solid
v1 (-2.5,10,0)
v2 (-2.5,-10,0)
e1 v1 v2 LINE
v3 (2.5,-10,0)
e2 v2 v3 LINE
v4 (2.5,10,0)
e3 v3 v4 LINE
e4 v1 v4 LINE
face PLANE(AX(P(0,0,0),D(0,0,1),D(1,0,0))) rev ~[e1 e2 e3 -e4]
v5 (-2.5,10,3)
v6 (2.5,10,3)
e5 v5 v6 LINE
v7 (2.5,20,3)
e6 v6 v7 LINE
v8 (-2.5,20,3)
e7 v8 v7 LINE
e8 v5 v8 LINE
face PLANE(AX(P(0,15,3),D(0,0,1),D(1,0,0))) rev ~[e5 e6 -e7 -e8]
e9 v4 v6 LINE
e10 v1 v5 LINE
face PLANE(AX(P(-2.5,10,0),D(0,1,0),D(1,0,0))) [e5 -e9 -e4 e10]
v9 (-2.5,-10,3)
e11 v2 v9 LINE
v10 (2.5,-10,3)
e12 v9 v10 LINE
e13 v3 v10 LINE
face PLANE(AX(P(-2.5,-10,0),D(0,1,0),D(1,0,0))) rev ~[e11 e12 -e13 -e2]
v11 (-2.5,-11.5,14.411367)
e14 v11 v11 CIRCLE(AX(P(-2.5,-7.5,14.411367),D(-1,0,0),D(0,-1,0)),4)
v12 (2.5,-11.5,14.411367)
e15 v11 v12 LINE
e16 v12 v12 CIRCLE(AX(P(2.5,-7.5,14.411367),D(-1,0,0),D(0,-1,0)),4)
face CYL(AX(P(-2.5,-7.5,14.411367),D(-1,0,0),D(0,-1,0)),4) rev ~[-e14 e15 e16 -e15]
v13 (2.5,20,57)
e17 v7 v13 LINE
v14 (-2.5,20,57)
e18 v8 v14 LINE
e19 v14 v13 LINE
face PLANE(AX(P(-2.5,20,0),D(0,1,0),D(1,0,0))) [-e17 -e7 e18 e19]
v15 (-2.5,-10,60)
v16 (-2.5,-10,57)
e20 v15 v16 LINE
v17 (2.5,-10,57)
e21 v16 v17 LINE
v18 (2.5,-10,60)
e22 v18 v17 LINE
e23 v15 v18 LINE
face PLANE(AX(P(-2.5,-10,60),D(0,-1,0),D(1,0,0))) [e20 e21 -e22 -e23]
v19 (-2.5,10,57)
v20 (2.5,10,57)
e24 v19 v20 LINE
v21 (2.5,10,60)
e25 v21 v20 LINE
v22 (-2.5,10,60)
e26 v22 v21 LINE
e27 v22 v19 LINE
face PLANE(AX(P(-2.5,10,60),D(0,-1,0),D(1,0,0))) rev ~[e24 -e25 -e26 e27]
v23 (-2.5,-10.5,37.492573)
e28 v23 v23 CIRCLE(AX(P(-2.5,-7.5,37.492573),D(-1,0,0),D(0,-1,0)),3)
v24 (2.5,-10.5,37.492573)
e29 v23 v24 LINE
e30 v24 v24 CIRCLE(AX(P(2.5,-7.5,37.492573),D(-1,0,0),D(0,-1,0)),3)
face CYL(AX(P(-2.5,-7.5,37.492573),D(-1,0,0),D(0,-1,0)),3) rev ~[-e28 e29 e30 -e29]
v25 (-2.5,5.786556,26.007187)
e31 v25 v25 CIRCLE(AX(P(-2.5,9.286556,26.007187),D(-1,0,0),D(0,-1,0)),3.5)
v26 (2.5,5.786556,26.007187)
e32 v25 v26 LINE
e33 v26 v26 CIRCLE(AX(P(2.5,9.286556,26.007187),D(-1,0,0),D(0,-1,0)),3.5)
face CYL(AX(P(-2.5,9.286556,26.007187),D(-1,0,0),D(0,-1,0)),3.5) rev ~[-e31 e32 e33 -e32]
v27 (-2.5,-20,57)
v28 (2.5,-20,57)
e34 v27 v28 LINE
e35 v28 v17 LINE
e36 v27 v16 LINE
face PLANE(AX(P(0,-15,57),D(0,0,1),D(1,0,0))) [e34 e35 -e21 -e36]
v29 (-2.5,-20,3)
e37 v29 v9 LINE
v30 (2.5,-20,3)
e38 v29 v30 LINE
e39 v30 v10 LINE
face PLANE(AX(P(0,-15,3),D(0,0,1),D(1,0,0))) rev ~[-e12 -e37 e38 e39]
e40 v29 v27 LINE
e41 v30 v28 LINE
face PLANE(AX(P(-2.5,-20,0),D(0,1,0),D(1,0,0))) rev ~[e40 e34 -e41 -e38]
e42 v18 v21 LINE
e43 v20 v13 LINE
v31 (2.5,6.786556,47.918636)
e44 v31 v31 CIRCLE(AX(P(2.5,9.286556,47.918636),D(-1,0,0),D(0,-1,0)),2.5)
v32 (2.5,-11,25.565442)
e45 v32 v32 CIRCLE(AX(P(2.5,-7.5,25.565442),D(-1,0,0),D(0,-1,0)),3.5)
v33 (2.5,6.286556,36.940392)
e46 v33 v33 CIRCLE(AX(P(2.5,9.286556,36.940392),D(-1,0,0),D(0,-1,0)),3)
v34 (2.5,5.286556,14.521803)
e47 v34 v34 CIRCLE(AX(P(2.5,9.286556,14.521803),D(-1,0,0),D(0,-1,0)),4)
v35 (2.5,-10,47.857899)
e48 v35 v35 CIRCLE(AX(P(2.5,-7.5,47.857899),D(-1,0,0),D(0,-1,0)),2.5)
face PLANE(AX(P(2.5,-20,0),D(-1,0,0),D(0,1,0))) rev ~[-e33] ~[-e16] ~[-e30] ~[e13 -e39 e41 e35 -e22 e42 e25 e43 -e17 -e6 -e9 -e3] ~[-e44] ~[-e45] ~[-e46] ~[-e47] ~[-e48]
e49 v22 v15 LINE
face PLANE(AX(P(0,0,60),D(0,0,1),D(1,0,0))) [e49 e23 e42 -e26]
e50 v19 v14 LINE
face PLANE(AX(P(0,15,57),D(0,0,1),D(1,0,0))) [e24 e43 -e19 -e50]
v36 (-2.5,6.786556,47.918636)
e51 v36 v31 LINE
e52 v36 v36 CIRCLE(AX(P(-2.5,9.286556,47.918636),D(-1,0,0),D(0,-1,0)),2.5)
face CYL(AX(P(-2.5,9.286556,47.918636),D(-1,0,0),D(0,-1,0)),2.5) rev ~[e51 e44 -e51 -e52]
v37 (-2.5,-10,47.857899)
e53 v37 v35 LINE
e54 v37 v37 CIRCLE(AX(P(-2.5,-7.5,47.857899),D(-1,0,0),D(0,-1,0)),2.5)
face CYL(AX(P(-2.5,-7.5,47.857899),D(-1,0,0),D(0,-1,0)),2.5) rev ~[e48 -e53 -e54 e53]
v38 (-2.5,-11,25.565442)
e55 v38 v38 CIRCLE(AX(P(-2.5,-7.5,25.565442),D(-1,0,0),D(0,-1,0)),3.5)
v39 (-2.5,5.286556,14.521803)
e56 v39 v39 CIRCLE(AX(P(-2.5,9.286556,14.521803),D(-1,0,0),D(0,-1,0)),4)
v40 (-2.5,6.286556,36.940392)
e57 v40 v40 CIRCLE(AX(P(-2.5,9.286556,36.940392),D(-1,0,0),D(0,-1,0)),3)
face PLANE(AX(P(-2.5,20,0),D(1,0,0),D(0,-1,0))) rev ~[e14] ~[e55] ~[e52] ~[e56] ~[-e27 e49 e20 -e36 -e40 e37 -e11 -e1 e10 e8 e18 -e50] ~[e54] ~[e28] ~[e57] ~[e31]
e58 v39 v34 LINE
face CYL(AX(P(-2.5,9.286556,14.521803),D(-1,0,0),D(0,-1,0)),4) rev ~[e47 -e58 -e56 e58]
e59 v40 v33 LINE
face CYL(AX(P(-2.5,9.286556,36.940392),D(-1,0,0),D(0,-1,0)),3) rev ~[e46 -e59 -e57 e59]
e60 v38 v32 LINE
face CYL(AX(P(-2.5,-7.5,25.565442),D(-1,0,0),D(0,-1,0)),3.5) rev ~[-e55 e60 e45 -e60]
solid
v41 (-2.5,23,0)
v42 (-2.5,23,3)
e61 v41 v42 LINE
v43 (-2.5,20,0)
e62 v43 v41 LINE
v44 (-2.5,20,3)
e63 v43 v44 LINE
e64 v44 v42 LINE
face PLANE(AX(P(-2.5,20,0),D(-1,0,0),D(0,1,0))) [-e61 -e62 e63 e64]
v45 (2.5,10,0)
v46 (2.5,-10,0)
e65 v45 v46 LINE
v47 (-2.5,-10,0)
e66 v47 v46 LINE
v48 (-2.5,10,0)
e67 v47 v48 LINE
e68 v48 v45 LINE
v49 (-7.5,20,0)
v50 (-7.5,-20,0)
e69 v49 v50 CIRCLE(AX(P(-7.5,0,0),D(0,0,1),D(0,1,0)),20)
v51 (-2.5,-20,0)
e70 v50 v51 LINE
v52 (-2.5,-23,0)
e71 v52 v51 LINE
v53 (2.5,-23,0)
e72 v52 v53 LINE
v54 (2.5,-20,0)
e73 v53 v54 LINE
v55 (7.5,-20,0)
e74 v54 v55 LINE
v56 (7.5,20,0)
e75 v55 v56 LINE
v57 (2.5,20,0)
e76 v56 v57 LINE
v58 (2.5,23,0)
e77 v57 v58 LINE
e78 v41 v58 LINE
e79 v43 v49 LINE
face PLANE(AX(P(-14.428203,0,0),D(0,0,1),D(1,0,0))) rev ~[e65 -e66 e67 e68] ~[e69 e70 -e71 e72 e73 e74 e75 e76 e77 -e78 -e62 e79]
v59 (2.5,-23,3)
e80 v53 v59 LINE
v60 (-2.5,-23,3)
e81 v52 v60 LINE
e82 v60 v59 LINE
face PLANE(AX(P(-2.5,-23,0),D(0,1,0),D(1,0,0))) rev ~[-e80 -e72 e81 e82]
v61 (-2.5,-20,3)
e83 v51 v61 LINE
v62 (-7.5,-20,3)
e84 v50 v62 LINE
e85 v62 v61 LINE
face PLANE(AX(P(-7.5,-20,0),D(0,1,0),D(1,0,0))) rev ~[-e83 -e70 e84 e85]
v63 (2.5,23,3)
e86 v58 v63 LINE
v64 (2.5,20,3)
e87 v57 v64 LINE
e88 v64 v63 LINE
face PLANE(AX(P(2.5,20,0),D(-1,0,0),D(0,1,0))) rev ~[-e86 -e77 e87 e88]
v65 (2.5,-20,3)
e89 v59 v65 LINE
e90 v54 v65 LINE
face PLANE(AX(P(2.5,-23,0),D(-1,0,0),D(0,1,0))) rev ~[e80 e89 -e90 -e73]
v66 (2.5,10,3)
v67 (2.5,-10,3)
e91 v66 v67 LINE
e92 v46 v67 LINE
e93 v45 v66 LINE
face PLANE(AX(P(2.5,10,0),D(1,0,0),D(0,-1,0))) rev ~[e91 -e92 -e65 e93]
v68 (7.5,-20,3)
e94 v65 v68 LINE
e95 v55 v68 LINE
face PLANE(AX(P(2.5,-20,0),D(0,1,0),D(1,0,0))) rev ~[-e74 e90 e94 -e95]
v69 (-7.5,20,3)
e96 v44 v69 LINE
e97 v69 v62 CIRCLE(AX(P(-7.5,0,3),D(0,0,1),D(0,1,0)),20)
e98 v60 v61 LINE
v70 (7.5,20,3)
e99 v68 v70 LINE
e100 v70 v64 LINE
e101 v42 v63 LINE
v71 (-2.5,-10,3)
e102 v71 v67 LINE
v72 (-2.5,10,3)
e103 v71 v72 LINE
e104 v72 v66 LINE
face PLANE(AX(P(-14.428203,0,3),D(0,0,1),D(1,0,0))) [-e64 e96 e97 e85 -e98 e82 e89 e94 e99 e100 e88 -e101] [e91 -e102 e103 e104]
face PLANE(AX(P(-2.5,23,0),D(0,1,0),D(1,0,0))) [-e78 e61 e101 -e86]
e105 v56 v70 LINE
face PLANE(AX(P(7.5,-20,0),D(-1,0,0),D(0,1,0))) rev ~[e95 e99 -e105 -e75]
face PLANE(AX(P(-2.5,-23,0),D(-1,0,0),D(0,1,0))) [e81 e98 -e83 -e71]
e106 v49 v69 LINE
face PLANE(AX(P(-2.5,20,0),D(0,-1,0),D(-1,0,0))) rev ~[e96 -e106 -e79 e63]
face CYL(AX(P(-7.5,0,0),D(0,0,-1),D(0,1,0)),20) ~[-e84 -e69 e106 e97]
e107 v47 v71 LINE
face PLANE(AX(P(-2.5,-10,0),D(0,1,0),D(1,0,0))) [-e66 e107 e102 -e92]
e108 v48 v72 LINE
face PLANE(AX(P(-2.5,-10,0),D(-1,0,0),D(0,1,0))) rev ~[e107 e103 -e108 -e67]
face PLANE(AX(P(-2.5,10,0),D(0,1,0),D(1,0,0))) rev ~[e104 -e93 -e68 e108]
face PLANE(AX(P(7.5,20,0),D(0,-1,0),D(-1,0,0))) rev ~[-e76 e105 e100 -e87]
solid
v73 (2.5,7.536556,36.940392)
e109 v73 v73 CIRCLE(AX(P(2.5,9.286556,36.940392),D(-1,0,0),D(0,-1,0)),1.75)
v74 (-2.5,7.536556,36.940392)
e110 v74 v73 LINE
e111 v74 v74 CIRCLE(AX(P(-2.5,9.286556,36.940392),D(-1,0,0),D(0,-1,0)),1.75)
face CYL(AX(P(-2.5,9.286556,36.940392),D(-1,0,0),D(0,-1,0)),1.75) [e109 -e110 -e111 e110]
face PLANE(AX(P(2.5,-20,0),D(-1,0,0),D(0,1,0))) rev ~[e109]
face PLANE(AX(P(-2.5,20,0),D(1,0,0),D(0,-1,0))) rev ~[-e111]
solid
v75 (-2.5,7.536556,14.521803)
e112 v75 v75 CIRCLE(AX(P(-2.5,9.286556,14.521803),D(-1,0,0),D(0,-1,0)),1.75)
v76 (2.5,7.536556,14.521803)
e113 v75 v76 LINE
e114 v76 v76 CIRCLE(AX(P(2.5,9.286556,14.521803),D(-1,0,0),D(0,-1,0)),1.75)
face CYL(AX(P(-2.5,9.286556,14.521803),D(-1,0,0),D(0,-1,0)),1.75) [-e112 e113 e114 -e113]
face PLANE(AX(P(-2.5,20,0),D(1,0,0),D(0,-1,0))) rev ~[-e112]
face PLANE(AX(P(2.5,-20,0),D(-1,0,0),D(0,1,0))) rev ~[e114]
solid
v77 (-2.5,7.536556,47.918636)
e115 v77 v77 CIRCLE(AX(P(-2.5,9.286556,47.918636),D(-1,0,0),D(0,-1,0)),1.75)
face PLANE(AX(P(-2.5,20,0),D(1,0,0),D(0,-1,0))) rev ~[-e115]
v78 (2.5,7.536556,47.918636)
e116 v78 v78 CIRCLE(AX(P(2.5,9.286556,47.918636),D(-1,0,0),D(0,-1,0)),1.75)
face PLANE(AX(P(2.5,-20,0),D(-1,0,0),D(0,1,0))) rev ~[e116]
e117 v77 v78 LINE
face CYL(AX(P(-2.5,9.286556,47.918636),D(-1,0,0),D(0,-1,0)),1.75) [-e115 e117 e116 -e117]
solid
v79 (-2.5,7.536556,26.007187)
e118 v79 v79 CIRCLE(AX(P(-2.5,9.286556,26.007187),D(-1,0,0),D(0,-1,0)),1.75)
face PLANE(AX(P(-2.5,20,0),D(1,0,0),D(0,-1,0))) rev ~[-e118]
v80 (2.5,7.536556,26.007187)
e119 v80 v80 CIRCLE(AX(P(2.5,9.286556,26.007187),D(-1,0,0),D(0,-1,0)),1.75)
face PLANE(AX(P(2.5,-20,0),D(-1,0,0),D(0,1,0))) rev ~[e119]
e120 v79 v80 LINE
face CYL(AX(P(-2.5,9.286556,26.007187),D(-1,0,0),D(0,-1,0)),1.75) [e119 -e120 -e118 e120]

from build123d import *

# Parameters (mm, degrees)
F0_W     = 5
F0_H     = 3
F0_H_2   = 10
F1_DEPTH = 3
F0_H_3   = 20
F2_DEPTH = 60
F3_DEPTH = 3
F4_W     = 5
F4_H     = 10
F5_DEPTH = 3
F6_R     = 2.5
F6_R_2   = 3
F6_R_3   = 3.5
F6_R_4   = 4
F6_R_5   = 1.75
F7_DEPTH = 5


with BuildPart() as f1:
    # F0 (on Top) → F1 (new body)
    with BuildSketch(Plane.XY):
        with BuildLine():
            Line((-7.5, -20), (-7.5, 20))
            ThreePointArc((-7.5, 20), (-27.5, 0), (-7.5, -20))
        make_face()
        Polygon((7.5, -20), (7.5, 20), (2.5, 20), (2.5, 10), (2.5, -10), (2.5, -20), align=None)
        with Locations((0, 21.5)):
            Rectangle(F0_W, F0_H)
        with Locations((0, -21.5)):
            Rectangle(F0_W, F0_H)
        Polygon((-2.5, 10), (-2.5, 20), (-7.5, 20), (-7.5, -20), (-2.5, -20), (-2.5, -10), align=None)
        with Locations((0, 15)):
            Rectangle(F0_W, F0_H_2)
        with Locations((0, -15)):
            Rectangle(F0_W, F0_H_2)
    extrude(amount=F1_DEPTH)


with BuildPart() as f2:
    # F0 (on Top) → F2 (new body)
    with BuildSketch(Plane.XY):
        Rectangle(F0_W, F0_H_3)
        with Locations((0, 15)):
            Rectangle(F0_W, F0_H_2)
        with Locations((0, -15)):
            Rectangle(F0_W, F0_H_2)
    extrude(amount=F2_DEPTH)

    # F0 (on Top) → F3 (cut)
    with BuildSketch(Plane.XY):
        with Locations((0, 15)):
            Rectangle(F0_W, F0_H_2)
        with Locations((0, -15)):
            Rectangle(F0_W, F0_H_2)
    extrude(amount=F3_DEPTH, mode=Mode.SUBTRACT)

    # F4 (on face) → F5 (cut)
    with BuildSketch(Plane.XY.offset(60)):
        with Locations((0, -15)):
            Rectangle(F4_W, F4_H)
        with Locations((0, 15)):
            Rectangle(F4_W, F4_H)
    extrude(amount=-F5_DEPTH, mode=Mode.SUBTRACT)

    # F6 (on face) → F7 (cut, through all)
    with BuildSketch(Plane(origin=(-2.5, 0, 0), x_dir=(0, -1, 0), z_dir=(-1, 0, 0))):
        with Locations((7.5, 47.8578992188)):
            Circle(F6_R)
        with Locations((7.5, 37.4925732613)):
            Circle(F6_R_2)
        with Locations((7.5, 25.5654416978)):
            Circle(F6_R_3)
        with Locations((7.5, 14.4113665447)):
            Circle(F6_R_4)
        with Locations((-9.2865563929, 14.5218027756)):
            Circle(F6_R_4)
        with Locations((-9.2865563929, 14.5218027756)):
            Circle(F6_R_5, mode=Mode.SUBTRACT)
        with Locations((-9.2865563929, 26.0071866214)):
            Circle(F6_R_3)
        with Locations((-9.2865563929, 26.0071866214)):
            Circle(F6_R_5, mode=Mode.SUBTRACT)
        with Locations((-9.2865563929, 36.9403921068)):
            Circle(F6_R_2)
        with Locations((-9.2865563929, 36.9403921068)):
            Circle(F6_R_5, mode=Mode.SUBTRACT)
        with Locations((-9.2865563929, 47.9186363518)):
            Circle(F6_R)
        with Locations((-9.2865563929, 47.9186363518)):
            Circle(F6_R_5, mode=Mode.SUBTRACT)
    extrude(amount=-F7_DEPTH, mode=Mode.SUBTRACT)


solid = Compound([f1.part, f2.part])
